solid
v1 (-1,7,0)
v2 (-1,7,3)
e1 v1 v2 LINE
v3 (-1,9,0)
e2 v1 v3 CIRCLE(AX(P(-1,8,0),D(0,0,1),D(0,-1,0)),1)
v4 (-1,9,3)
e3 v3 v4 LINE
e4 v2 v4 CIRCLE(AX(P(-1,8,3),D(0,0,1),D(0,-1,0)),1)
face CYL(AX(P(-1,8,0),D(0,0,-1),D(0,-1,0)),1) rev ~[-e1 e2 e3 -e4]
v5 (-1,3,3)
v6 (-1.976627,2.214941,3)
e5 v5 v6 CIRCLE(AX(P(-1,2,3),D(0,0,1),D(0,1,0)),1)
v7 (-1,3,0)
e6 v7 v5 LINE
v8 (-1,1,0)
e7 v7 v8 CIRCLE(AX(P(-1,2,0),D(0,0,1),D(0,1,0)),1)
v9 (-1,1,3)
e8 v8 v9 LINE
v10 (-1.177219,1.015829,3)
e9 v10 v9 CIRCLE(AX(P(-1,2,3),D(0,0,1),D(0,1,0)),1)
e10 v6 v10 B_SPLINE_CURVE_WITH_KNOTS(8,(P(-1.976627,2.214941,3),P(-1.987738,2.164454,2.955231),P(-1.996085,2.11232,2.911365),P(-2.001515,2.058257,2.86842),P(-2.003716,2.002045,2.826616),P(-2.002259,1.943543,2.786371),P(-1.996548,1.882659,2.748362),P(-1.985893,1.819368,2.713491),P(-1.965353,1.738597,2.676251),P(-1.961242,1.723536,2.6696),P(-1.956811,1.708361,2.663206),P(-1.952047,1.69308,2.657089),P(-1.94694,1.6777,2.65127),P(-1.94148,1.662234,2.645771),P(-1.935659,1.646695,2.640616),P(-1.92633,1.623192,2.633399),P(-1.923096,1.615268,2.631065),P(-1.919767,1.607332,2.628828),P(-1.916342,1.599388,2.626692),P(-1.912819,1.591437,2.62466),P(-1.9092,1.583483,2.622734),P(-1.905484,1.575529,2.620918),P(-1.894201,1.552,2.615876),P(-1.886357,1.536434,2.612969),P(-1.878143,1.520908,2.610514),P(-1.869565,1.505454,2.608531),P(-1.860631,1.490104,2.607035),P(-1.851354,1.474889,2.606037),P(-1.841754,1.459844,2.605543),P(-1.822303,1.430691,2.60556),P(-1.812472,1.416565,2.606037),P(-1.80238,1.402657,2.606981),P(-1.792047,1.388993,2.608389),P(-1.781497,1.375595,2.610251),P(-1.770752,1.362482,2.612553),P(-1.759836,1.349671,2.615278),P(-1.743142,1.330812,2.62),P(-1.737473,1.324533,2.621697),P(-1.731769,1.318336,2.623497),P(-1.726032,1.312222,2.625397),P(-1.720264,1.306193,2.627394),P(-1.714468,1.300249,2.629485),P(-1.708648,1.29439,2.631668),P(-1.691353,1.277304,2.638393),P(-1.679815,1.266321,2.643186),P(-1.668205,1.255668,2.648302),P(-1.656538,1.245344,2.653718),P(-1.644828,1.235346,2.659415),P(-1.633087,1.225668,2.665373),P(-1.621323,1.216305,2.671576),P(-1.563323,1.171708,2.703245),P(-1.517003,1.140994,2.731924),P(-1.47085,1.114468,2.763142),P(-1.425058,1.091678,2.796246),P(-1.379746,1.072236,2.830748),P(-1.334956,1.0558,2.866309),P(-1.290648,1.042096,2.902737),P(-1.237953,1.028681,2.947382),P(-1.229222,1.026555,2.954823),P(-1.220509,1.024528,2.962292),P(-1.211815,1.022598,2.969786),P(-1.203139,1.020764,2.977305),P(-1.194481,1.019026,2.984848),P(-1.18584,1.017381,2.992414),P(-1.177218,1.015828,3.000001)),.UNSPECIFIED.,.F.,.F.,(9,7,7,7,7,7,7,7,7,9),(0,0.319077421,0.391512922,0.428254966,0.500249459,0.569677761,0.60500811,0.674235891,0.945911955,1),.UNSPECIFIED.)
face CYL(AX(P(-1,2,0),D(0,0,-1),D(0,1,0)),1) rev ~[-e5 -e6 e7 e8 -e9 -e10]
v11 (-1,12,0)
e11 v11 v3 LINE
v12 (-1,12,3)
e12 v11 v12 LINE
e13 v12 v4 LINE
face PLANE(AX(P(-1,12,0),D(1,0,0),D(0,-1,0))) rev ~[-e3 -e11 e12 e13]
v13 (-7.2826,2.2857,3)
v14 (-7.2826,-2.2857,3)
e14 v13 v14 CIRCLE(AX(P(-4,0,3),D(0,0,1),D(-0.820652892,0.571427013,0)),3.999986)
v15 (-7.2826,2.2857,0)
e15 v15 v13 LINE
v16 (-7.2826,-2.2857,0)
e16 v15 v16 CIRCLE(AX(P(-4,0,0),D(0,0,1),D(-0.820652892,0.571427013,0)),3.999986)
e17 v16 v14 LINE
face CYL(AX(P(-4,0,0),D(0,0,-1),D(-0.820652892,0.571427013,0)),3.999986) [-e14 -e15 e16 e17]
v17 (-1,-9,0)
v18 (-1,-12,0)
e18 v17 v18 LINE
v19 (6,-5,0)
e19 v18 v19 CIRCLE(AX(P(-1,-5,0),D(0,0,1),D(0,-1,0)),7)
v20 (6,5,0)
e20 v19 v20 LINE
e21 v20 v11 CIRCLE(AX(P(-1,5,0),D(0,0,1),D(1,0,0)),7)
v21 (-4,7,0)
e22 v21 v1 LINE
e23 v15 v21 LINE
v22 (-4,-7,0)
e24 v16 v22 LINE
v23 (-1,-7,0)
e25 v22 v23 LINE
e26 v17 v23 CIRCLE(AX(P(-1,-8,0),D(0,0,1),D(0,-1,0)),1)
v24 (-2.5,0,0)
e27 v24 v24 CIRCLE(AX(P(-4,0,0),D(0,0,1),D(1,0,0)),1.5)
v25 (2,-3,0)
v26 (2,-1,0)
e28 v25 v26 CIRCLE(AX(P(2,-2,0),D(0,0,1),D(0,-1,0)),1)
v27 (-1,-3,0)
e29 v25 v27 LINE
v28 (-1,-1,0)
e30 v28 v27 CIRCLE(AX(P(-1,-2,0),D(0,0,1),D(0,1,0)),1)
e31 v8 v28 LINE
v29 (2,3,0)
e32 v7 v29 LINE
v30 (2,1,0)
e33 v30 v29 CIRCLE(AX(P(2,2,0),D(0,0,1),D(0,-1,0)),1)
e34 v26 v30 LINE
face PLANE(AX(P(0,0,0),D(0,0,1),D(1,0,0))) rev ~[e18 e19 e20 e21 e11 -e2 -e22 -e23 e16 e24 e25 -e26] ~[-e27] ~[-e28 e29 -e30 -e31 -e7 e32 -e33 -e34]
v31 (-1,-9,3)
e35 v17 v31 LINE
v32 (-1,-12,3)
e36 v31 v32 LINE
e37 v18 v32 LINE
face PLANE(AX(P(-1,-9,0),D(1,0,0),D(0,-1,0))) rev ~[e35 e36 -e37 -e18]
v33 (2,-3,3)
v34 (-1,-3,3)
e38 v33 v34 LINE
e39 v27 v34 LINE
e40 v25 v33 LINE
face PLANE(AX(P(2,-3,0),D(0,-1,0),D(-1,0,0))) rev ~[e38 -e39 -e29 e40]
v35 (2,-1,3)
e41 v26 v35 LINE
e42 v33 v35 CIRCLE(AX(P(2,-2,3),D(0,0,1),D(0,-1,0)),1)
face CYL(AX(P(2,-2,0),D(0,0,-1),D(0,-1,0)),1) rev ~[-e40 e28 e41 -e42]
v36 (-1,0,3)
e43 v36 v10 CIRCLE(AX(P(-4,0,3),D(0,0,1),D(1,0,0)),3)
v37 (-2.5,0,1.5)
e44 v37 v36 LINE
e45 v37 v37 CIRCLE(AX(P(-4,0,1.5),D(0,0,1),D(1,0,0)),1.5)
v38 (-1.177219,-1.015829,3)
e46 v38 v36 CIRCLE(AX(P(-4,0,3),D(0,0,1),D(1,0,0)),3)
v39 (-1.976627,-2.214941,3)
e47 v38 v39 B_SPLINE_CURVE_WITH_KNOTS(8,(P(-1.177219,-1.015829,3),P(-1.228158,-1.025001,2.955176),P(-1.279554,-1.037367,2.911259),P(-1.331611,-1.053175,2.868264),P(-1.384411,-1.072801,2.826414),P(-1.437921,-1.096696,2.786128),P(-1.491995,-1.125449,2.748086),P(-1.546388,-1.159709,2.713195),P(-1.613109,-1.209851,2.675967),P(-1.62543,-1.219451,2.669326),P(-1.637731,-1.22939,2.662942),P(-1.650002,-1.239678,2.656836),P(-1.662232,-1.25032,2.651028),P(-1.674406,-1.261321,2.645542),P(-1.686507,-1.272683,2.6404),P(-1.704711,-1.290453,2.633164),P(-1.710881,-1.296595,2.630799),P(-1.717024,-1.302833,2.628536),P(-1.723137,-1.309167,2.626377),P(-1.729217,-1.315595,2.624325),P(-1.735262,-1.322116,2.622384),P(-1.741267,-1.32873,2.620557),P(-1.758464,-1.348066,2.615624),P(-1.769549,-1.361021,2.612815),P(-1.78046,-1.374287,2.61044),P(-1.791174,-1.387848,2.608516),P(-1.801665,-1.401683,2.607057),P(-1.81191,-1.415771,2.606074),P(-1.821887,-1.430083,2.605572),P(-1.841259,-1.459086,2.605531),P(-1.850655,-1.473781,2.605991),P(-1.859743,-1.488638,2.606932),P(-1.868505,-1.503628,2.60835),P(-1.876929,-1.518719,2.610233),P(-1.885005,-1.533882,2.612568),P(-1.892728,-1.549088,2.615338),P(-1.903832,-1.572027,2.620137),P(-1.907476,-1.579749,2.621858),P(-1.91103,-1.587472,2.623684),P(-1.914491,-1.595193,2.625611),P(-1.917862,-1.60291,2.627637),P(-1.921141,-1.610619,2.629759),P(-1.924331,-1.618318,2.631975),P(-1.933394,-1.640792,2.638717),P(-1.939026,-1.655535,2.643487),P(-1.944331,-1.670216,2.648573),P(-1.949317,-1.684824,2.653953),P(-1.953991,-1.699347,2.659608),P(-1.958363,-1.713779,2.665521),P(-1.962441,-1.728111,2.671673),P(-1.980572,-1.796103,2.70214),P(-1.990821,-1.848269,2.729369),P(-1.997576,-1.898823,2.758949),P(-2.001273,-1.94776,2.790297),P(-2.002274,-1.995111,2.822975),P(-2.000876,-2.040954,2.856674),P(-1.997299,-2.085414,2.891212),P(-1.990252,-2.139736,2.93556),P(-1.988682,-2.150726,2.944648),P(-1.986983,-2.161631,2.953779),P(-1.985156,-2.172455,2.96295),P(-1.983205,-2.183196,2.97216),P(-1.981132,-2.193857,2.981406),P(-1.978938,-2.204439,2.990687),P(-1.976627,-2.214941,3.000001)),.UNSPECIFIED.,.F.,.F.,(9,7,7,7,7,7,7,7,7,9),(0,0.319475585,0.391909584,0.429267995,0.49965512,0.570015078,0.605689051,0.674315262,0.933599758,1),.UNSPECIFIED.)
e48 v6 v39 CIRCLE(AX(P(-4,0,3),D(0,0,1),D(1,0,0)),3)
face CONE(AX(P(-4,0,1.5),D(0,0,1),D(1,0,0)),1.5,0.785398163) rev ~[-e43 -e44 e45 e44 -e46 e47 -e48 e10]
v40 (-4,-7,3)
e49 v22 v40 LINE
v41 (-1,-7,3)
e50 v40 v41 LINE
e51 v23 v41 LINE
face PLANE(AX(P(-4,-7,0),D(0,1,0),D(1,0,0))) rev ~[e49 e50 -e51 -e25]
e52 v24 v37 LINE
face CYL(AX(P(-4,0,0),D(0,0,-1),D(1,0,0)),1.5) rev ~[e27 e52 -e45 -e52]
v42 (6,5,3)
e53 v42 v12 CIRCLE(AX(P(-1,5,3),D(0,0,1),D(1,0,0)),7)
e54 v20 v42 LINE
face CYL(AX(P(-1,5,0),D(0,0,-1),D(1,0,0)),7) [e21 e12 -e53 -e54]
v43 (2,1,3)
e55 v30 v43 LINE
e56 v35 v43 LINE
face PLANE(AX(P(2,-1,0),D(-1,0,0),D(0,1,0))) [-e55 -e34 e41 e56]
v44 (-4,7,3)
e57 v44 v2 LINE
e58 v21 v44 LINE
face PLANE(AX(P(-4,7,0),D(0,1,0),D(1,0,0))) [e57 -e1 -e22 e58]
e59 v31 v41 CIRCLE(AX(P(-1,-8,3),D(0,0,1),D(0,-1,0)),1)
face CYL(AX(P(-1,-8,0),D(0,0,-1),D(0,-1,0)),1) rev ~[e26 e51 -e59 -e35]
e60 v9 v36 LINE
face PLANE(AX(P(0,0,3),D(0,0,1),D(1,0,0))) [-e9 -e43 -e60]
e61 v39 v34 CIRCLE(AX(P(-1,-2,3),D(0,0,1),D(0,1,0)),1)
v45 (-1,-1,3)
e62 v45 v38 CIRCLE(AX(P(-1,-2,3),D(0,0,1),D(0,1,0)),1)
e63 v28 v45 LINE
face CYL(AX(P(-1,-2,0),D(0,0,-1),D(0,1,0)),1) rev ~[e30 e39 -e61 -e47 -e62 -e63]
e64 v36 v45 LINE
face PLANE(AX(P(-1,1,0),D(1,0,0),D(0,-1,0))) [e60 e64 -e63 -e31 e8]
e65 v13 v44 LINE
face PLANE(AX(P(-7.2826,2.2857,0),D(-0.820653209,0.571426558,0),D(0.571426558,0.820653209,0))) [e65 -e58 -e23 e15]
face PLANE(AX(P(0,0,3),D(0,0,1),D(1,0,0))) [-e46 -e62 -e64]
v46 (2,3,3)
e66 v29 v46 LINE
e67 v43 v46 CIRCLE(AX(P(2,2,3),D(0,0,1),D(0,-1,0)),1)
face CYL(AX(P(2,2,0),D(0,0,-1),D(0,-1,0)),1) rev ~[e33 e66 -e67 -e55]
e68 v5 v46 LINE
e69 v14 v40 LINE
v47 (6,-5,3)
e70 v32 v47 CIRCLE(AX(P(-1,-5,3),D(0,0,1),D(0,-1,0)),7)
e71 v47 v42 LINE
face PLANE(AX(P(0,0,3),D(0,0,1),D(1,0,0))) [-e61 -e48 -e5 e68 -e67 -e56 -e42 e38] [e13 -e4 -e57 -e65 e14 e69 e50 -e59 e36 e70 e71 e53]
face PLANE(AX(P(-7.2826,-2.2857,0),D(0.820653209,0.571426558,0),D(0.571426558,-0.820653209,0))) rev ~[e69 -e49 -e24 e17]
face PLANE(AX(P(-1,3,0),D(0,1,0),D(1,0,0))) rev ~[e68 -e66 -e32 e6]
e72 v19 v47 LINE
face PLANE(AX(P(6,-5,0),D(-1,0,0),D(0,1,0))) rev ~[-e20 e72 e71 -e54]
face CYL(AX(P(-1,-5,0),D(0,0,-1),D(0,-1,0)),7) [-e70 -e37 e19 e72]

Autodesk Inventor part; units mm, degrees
ref_plane "YZ Plane" through (0, 0, 0) normal (1, 0, 0) x (0, 1, 0)
ref_plane "XZ Plane" through (0, 0, 0) normal (0, 1, 0) x (-1, 0, 0)
ref_plane "XY Plane" through (0, 0, 0) normal (0, 0, 1) x (1, 0, 0)
sketch "スケッチ5" plane through (0, 0, 0) normal (0, 0, 1) x (1, 0, 0)
  line L0 (-1, 1) -> (-1, -1)
  circle A0 centre (-4, 0) radius 1.5
  arc A1 (2, 1) -> (2, 3) centre (2, 2) ccw
  arc A2 (2, -3) -> (2, -1) centre (2, -2) ccw
  arc A3 (-1, 3) -> (-1, 1) centre (-1, 2) ccw
  arc A4 (-1, -1) -> (-1, -3) centre (-1, -2) ccw
  line L1 (2, -3) -> (-1, -3)
  line L2 (-1, 3) -> (2, 3)
  arc A5 (-7.2826, 2.2857) -> (-7.2826, -2.2857) centre (-4, 0) ccw
  line L3 (-1, -7) -> (-1, -7)
  line L4 (6, -5) -> (6, 5)
  line L5 (-1, 7) -> (-1, 7)
  line L6 (0, 0) -> (-1, 0) construction
  arc A6 (-1, -9) -> (-1, -7) centre (-1, -8) ccw
  line L7 (-1, -9) -> (-1, -12)
  arc A7 (-1, -12) -> (6, -5) centre (-1, -5) ccw
  arc A8 (6, 5) -> (-1, 12) centre (-1, 5) ccw
  line L8 (-1, 12) -> (-1, 9)
  arc A9 (-1, 7) -> (-1, 9) centre (-1, 8) ccw
  line L9 (2, -1) -> (2, 1)
  line L10 (-7.2826, -2.2857) -> (-4, -7)
  line L11 (-4, -7) -> (-1, -7)
  line L12 (-7.2826, 2.2857) -> (-4, 7)
  line L13 (-4, 7) -> (-1, 7)
  point P0 (2, 0)
  point P1 (6, 0)
  point P2 (2, 0)
  dimension "d57" = 3
  dimension "d58" = 2
  dimension "d60" = 4
  dimension "d61" = 4
  dimension "d62" = 3
  dimension "d63" = 14
  dimension "d65" = 4
  dimension "d66" = 3
  dimension "d67" = 2
  dimension "d68" = 3
  dimension "d69" = 6
  dimension "d72" = 3
extrude "押し出し2" add sketch "スケッチ5" along normal blind 3
chamfer "面取り2" distance 1.5 angle 45 1 edges at (-5.5, 0, 3)
properties part number "ShaftBase2"
